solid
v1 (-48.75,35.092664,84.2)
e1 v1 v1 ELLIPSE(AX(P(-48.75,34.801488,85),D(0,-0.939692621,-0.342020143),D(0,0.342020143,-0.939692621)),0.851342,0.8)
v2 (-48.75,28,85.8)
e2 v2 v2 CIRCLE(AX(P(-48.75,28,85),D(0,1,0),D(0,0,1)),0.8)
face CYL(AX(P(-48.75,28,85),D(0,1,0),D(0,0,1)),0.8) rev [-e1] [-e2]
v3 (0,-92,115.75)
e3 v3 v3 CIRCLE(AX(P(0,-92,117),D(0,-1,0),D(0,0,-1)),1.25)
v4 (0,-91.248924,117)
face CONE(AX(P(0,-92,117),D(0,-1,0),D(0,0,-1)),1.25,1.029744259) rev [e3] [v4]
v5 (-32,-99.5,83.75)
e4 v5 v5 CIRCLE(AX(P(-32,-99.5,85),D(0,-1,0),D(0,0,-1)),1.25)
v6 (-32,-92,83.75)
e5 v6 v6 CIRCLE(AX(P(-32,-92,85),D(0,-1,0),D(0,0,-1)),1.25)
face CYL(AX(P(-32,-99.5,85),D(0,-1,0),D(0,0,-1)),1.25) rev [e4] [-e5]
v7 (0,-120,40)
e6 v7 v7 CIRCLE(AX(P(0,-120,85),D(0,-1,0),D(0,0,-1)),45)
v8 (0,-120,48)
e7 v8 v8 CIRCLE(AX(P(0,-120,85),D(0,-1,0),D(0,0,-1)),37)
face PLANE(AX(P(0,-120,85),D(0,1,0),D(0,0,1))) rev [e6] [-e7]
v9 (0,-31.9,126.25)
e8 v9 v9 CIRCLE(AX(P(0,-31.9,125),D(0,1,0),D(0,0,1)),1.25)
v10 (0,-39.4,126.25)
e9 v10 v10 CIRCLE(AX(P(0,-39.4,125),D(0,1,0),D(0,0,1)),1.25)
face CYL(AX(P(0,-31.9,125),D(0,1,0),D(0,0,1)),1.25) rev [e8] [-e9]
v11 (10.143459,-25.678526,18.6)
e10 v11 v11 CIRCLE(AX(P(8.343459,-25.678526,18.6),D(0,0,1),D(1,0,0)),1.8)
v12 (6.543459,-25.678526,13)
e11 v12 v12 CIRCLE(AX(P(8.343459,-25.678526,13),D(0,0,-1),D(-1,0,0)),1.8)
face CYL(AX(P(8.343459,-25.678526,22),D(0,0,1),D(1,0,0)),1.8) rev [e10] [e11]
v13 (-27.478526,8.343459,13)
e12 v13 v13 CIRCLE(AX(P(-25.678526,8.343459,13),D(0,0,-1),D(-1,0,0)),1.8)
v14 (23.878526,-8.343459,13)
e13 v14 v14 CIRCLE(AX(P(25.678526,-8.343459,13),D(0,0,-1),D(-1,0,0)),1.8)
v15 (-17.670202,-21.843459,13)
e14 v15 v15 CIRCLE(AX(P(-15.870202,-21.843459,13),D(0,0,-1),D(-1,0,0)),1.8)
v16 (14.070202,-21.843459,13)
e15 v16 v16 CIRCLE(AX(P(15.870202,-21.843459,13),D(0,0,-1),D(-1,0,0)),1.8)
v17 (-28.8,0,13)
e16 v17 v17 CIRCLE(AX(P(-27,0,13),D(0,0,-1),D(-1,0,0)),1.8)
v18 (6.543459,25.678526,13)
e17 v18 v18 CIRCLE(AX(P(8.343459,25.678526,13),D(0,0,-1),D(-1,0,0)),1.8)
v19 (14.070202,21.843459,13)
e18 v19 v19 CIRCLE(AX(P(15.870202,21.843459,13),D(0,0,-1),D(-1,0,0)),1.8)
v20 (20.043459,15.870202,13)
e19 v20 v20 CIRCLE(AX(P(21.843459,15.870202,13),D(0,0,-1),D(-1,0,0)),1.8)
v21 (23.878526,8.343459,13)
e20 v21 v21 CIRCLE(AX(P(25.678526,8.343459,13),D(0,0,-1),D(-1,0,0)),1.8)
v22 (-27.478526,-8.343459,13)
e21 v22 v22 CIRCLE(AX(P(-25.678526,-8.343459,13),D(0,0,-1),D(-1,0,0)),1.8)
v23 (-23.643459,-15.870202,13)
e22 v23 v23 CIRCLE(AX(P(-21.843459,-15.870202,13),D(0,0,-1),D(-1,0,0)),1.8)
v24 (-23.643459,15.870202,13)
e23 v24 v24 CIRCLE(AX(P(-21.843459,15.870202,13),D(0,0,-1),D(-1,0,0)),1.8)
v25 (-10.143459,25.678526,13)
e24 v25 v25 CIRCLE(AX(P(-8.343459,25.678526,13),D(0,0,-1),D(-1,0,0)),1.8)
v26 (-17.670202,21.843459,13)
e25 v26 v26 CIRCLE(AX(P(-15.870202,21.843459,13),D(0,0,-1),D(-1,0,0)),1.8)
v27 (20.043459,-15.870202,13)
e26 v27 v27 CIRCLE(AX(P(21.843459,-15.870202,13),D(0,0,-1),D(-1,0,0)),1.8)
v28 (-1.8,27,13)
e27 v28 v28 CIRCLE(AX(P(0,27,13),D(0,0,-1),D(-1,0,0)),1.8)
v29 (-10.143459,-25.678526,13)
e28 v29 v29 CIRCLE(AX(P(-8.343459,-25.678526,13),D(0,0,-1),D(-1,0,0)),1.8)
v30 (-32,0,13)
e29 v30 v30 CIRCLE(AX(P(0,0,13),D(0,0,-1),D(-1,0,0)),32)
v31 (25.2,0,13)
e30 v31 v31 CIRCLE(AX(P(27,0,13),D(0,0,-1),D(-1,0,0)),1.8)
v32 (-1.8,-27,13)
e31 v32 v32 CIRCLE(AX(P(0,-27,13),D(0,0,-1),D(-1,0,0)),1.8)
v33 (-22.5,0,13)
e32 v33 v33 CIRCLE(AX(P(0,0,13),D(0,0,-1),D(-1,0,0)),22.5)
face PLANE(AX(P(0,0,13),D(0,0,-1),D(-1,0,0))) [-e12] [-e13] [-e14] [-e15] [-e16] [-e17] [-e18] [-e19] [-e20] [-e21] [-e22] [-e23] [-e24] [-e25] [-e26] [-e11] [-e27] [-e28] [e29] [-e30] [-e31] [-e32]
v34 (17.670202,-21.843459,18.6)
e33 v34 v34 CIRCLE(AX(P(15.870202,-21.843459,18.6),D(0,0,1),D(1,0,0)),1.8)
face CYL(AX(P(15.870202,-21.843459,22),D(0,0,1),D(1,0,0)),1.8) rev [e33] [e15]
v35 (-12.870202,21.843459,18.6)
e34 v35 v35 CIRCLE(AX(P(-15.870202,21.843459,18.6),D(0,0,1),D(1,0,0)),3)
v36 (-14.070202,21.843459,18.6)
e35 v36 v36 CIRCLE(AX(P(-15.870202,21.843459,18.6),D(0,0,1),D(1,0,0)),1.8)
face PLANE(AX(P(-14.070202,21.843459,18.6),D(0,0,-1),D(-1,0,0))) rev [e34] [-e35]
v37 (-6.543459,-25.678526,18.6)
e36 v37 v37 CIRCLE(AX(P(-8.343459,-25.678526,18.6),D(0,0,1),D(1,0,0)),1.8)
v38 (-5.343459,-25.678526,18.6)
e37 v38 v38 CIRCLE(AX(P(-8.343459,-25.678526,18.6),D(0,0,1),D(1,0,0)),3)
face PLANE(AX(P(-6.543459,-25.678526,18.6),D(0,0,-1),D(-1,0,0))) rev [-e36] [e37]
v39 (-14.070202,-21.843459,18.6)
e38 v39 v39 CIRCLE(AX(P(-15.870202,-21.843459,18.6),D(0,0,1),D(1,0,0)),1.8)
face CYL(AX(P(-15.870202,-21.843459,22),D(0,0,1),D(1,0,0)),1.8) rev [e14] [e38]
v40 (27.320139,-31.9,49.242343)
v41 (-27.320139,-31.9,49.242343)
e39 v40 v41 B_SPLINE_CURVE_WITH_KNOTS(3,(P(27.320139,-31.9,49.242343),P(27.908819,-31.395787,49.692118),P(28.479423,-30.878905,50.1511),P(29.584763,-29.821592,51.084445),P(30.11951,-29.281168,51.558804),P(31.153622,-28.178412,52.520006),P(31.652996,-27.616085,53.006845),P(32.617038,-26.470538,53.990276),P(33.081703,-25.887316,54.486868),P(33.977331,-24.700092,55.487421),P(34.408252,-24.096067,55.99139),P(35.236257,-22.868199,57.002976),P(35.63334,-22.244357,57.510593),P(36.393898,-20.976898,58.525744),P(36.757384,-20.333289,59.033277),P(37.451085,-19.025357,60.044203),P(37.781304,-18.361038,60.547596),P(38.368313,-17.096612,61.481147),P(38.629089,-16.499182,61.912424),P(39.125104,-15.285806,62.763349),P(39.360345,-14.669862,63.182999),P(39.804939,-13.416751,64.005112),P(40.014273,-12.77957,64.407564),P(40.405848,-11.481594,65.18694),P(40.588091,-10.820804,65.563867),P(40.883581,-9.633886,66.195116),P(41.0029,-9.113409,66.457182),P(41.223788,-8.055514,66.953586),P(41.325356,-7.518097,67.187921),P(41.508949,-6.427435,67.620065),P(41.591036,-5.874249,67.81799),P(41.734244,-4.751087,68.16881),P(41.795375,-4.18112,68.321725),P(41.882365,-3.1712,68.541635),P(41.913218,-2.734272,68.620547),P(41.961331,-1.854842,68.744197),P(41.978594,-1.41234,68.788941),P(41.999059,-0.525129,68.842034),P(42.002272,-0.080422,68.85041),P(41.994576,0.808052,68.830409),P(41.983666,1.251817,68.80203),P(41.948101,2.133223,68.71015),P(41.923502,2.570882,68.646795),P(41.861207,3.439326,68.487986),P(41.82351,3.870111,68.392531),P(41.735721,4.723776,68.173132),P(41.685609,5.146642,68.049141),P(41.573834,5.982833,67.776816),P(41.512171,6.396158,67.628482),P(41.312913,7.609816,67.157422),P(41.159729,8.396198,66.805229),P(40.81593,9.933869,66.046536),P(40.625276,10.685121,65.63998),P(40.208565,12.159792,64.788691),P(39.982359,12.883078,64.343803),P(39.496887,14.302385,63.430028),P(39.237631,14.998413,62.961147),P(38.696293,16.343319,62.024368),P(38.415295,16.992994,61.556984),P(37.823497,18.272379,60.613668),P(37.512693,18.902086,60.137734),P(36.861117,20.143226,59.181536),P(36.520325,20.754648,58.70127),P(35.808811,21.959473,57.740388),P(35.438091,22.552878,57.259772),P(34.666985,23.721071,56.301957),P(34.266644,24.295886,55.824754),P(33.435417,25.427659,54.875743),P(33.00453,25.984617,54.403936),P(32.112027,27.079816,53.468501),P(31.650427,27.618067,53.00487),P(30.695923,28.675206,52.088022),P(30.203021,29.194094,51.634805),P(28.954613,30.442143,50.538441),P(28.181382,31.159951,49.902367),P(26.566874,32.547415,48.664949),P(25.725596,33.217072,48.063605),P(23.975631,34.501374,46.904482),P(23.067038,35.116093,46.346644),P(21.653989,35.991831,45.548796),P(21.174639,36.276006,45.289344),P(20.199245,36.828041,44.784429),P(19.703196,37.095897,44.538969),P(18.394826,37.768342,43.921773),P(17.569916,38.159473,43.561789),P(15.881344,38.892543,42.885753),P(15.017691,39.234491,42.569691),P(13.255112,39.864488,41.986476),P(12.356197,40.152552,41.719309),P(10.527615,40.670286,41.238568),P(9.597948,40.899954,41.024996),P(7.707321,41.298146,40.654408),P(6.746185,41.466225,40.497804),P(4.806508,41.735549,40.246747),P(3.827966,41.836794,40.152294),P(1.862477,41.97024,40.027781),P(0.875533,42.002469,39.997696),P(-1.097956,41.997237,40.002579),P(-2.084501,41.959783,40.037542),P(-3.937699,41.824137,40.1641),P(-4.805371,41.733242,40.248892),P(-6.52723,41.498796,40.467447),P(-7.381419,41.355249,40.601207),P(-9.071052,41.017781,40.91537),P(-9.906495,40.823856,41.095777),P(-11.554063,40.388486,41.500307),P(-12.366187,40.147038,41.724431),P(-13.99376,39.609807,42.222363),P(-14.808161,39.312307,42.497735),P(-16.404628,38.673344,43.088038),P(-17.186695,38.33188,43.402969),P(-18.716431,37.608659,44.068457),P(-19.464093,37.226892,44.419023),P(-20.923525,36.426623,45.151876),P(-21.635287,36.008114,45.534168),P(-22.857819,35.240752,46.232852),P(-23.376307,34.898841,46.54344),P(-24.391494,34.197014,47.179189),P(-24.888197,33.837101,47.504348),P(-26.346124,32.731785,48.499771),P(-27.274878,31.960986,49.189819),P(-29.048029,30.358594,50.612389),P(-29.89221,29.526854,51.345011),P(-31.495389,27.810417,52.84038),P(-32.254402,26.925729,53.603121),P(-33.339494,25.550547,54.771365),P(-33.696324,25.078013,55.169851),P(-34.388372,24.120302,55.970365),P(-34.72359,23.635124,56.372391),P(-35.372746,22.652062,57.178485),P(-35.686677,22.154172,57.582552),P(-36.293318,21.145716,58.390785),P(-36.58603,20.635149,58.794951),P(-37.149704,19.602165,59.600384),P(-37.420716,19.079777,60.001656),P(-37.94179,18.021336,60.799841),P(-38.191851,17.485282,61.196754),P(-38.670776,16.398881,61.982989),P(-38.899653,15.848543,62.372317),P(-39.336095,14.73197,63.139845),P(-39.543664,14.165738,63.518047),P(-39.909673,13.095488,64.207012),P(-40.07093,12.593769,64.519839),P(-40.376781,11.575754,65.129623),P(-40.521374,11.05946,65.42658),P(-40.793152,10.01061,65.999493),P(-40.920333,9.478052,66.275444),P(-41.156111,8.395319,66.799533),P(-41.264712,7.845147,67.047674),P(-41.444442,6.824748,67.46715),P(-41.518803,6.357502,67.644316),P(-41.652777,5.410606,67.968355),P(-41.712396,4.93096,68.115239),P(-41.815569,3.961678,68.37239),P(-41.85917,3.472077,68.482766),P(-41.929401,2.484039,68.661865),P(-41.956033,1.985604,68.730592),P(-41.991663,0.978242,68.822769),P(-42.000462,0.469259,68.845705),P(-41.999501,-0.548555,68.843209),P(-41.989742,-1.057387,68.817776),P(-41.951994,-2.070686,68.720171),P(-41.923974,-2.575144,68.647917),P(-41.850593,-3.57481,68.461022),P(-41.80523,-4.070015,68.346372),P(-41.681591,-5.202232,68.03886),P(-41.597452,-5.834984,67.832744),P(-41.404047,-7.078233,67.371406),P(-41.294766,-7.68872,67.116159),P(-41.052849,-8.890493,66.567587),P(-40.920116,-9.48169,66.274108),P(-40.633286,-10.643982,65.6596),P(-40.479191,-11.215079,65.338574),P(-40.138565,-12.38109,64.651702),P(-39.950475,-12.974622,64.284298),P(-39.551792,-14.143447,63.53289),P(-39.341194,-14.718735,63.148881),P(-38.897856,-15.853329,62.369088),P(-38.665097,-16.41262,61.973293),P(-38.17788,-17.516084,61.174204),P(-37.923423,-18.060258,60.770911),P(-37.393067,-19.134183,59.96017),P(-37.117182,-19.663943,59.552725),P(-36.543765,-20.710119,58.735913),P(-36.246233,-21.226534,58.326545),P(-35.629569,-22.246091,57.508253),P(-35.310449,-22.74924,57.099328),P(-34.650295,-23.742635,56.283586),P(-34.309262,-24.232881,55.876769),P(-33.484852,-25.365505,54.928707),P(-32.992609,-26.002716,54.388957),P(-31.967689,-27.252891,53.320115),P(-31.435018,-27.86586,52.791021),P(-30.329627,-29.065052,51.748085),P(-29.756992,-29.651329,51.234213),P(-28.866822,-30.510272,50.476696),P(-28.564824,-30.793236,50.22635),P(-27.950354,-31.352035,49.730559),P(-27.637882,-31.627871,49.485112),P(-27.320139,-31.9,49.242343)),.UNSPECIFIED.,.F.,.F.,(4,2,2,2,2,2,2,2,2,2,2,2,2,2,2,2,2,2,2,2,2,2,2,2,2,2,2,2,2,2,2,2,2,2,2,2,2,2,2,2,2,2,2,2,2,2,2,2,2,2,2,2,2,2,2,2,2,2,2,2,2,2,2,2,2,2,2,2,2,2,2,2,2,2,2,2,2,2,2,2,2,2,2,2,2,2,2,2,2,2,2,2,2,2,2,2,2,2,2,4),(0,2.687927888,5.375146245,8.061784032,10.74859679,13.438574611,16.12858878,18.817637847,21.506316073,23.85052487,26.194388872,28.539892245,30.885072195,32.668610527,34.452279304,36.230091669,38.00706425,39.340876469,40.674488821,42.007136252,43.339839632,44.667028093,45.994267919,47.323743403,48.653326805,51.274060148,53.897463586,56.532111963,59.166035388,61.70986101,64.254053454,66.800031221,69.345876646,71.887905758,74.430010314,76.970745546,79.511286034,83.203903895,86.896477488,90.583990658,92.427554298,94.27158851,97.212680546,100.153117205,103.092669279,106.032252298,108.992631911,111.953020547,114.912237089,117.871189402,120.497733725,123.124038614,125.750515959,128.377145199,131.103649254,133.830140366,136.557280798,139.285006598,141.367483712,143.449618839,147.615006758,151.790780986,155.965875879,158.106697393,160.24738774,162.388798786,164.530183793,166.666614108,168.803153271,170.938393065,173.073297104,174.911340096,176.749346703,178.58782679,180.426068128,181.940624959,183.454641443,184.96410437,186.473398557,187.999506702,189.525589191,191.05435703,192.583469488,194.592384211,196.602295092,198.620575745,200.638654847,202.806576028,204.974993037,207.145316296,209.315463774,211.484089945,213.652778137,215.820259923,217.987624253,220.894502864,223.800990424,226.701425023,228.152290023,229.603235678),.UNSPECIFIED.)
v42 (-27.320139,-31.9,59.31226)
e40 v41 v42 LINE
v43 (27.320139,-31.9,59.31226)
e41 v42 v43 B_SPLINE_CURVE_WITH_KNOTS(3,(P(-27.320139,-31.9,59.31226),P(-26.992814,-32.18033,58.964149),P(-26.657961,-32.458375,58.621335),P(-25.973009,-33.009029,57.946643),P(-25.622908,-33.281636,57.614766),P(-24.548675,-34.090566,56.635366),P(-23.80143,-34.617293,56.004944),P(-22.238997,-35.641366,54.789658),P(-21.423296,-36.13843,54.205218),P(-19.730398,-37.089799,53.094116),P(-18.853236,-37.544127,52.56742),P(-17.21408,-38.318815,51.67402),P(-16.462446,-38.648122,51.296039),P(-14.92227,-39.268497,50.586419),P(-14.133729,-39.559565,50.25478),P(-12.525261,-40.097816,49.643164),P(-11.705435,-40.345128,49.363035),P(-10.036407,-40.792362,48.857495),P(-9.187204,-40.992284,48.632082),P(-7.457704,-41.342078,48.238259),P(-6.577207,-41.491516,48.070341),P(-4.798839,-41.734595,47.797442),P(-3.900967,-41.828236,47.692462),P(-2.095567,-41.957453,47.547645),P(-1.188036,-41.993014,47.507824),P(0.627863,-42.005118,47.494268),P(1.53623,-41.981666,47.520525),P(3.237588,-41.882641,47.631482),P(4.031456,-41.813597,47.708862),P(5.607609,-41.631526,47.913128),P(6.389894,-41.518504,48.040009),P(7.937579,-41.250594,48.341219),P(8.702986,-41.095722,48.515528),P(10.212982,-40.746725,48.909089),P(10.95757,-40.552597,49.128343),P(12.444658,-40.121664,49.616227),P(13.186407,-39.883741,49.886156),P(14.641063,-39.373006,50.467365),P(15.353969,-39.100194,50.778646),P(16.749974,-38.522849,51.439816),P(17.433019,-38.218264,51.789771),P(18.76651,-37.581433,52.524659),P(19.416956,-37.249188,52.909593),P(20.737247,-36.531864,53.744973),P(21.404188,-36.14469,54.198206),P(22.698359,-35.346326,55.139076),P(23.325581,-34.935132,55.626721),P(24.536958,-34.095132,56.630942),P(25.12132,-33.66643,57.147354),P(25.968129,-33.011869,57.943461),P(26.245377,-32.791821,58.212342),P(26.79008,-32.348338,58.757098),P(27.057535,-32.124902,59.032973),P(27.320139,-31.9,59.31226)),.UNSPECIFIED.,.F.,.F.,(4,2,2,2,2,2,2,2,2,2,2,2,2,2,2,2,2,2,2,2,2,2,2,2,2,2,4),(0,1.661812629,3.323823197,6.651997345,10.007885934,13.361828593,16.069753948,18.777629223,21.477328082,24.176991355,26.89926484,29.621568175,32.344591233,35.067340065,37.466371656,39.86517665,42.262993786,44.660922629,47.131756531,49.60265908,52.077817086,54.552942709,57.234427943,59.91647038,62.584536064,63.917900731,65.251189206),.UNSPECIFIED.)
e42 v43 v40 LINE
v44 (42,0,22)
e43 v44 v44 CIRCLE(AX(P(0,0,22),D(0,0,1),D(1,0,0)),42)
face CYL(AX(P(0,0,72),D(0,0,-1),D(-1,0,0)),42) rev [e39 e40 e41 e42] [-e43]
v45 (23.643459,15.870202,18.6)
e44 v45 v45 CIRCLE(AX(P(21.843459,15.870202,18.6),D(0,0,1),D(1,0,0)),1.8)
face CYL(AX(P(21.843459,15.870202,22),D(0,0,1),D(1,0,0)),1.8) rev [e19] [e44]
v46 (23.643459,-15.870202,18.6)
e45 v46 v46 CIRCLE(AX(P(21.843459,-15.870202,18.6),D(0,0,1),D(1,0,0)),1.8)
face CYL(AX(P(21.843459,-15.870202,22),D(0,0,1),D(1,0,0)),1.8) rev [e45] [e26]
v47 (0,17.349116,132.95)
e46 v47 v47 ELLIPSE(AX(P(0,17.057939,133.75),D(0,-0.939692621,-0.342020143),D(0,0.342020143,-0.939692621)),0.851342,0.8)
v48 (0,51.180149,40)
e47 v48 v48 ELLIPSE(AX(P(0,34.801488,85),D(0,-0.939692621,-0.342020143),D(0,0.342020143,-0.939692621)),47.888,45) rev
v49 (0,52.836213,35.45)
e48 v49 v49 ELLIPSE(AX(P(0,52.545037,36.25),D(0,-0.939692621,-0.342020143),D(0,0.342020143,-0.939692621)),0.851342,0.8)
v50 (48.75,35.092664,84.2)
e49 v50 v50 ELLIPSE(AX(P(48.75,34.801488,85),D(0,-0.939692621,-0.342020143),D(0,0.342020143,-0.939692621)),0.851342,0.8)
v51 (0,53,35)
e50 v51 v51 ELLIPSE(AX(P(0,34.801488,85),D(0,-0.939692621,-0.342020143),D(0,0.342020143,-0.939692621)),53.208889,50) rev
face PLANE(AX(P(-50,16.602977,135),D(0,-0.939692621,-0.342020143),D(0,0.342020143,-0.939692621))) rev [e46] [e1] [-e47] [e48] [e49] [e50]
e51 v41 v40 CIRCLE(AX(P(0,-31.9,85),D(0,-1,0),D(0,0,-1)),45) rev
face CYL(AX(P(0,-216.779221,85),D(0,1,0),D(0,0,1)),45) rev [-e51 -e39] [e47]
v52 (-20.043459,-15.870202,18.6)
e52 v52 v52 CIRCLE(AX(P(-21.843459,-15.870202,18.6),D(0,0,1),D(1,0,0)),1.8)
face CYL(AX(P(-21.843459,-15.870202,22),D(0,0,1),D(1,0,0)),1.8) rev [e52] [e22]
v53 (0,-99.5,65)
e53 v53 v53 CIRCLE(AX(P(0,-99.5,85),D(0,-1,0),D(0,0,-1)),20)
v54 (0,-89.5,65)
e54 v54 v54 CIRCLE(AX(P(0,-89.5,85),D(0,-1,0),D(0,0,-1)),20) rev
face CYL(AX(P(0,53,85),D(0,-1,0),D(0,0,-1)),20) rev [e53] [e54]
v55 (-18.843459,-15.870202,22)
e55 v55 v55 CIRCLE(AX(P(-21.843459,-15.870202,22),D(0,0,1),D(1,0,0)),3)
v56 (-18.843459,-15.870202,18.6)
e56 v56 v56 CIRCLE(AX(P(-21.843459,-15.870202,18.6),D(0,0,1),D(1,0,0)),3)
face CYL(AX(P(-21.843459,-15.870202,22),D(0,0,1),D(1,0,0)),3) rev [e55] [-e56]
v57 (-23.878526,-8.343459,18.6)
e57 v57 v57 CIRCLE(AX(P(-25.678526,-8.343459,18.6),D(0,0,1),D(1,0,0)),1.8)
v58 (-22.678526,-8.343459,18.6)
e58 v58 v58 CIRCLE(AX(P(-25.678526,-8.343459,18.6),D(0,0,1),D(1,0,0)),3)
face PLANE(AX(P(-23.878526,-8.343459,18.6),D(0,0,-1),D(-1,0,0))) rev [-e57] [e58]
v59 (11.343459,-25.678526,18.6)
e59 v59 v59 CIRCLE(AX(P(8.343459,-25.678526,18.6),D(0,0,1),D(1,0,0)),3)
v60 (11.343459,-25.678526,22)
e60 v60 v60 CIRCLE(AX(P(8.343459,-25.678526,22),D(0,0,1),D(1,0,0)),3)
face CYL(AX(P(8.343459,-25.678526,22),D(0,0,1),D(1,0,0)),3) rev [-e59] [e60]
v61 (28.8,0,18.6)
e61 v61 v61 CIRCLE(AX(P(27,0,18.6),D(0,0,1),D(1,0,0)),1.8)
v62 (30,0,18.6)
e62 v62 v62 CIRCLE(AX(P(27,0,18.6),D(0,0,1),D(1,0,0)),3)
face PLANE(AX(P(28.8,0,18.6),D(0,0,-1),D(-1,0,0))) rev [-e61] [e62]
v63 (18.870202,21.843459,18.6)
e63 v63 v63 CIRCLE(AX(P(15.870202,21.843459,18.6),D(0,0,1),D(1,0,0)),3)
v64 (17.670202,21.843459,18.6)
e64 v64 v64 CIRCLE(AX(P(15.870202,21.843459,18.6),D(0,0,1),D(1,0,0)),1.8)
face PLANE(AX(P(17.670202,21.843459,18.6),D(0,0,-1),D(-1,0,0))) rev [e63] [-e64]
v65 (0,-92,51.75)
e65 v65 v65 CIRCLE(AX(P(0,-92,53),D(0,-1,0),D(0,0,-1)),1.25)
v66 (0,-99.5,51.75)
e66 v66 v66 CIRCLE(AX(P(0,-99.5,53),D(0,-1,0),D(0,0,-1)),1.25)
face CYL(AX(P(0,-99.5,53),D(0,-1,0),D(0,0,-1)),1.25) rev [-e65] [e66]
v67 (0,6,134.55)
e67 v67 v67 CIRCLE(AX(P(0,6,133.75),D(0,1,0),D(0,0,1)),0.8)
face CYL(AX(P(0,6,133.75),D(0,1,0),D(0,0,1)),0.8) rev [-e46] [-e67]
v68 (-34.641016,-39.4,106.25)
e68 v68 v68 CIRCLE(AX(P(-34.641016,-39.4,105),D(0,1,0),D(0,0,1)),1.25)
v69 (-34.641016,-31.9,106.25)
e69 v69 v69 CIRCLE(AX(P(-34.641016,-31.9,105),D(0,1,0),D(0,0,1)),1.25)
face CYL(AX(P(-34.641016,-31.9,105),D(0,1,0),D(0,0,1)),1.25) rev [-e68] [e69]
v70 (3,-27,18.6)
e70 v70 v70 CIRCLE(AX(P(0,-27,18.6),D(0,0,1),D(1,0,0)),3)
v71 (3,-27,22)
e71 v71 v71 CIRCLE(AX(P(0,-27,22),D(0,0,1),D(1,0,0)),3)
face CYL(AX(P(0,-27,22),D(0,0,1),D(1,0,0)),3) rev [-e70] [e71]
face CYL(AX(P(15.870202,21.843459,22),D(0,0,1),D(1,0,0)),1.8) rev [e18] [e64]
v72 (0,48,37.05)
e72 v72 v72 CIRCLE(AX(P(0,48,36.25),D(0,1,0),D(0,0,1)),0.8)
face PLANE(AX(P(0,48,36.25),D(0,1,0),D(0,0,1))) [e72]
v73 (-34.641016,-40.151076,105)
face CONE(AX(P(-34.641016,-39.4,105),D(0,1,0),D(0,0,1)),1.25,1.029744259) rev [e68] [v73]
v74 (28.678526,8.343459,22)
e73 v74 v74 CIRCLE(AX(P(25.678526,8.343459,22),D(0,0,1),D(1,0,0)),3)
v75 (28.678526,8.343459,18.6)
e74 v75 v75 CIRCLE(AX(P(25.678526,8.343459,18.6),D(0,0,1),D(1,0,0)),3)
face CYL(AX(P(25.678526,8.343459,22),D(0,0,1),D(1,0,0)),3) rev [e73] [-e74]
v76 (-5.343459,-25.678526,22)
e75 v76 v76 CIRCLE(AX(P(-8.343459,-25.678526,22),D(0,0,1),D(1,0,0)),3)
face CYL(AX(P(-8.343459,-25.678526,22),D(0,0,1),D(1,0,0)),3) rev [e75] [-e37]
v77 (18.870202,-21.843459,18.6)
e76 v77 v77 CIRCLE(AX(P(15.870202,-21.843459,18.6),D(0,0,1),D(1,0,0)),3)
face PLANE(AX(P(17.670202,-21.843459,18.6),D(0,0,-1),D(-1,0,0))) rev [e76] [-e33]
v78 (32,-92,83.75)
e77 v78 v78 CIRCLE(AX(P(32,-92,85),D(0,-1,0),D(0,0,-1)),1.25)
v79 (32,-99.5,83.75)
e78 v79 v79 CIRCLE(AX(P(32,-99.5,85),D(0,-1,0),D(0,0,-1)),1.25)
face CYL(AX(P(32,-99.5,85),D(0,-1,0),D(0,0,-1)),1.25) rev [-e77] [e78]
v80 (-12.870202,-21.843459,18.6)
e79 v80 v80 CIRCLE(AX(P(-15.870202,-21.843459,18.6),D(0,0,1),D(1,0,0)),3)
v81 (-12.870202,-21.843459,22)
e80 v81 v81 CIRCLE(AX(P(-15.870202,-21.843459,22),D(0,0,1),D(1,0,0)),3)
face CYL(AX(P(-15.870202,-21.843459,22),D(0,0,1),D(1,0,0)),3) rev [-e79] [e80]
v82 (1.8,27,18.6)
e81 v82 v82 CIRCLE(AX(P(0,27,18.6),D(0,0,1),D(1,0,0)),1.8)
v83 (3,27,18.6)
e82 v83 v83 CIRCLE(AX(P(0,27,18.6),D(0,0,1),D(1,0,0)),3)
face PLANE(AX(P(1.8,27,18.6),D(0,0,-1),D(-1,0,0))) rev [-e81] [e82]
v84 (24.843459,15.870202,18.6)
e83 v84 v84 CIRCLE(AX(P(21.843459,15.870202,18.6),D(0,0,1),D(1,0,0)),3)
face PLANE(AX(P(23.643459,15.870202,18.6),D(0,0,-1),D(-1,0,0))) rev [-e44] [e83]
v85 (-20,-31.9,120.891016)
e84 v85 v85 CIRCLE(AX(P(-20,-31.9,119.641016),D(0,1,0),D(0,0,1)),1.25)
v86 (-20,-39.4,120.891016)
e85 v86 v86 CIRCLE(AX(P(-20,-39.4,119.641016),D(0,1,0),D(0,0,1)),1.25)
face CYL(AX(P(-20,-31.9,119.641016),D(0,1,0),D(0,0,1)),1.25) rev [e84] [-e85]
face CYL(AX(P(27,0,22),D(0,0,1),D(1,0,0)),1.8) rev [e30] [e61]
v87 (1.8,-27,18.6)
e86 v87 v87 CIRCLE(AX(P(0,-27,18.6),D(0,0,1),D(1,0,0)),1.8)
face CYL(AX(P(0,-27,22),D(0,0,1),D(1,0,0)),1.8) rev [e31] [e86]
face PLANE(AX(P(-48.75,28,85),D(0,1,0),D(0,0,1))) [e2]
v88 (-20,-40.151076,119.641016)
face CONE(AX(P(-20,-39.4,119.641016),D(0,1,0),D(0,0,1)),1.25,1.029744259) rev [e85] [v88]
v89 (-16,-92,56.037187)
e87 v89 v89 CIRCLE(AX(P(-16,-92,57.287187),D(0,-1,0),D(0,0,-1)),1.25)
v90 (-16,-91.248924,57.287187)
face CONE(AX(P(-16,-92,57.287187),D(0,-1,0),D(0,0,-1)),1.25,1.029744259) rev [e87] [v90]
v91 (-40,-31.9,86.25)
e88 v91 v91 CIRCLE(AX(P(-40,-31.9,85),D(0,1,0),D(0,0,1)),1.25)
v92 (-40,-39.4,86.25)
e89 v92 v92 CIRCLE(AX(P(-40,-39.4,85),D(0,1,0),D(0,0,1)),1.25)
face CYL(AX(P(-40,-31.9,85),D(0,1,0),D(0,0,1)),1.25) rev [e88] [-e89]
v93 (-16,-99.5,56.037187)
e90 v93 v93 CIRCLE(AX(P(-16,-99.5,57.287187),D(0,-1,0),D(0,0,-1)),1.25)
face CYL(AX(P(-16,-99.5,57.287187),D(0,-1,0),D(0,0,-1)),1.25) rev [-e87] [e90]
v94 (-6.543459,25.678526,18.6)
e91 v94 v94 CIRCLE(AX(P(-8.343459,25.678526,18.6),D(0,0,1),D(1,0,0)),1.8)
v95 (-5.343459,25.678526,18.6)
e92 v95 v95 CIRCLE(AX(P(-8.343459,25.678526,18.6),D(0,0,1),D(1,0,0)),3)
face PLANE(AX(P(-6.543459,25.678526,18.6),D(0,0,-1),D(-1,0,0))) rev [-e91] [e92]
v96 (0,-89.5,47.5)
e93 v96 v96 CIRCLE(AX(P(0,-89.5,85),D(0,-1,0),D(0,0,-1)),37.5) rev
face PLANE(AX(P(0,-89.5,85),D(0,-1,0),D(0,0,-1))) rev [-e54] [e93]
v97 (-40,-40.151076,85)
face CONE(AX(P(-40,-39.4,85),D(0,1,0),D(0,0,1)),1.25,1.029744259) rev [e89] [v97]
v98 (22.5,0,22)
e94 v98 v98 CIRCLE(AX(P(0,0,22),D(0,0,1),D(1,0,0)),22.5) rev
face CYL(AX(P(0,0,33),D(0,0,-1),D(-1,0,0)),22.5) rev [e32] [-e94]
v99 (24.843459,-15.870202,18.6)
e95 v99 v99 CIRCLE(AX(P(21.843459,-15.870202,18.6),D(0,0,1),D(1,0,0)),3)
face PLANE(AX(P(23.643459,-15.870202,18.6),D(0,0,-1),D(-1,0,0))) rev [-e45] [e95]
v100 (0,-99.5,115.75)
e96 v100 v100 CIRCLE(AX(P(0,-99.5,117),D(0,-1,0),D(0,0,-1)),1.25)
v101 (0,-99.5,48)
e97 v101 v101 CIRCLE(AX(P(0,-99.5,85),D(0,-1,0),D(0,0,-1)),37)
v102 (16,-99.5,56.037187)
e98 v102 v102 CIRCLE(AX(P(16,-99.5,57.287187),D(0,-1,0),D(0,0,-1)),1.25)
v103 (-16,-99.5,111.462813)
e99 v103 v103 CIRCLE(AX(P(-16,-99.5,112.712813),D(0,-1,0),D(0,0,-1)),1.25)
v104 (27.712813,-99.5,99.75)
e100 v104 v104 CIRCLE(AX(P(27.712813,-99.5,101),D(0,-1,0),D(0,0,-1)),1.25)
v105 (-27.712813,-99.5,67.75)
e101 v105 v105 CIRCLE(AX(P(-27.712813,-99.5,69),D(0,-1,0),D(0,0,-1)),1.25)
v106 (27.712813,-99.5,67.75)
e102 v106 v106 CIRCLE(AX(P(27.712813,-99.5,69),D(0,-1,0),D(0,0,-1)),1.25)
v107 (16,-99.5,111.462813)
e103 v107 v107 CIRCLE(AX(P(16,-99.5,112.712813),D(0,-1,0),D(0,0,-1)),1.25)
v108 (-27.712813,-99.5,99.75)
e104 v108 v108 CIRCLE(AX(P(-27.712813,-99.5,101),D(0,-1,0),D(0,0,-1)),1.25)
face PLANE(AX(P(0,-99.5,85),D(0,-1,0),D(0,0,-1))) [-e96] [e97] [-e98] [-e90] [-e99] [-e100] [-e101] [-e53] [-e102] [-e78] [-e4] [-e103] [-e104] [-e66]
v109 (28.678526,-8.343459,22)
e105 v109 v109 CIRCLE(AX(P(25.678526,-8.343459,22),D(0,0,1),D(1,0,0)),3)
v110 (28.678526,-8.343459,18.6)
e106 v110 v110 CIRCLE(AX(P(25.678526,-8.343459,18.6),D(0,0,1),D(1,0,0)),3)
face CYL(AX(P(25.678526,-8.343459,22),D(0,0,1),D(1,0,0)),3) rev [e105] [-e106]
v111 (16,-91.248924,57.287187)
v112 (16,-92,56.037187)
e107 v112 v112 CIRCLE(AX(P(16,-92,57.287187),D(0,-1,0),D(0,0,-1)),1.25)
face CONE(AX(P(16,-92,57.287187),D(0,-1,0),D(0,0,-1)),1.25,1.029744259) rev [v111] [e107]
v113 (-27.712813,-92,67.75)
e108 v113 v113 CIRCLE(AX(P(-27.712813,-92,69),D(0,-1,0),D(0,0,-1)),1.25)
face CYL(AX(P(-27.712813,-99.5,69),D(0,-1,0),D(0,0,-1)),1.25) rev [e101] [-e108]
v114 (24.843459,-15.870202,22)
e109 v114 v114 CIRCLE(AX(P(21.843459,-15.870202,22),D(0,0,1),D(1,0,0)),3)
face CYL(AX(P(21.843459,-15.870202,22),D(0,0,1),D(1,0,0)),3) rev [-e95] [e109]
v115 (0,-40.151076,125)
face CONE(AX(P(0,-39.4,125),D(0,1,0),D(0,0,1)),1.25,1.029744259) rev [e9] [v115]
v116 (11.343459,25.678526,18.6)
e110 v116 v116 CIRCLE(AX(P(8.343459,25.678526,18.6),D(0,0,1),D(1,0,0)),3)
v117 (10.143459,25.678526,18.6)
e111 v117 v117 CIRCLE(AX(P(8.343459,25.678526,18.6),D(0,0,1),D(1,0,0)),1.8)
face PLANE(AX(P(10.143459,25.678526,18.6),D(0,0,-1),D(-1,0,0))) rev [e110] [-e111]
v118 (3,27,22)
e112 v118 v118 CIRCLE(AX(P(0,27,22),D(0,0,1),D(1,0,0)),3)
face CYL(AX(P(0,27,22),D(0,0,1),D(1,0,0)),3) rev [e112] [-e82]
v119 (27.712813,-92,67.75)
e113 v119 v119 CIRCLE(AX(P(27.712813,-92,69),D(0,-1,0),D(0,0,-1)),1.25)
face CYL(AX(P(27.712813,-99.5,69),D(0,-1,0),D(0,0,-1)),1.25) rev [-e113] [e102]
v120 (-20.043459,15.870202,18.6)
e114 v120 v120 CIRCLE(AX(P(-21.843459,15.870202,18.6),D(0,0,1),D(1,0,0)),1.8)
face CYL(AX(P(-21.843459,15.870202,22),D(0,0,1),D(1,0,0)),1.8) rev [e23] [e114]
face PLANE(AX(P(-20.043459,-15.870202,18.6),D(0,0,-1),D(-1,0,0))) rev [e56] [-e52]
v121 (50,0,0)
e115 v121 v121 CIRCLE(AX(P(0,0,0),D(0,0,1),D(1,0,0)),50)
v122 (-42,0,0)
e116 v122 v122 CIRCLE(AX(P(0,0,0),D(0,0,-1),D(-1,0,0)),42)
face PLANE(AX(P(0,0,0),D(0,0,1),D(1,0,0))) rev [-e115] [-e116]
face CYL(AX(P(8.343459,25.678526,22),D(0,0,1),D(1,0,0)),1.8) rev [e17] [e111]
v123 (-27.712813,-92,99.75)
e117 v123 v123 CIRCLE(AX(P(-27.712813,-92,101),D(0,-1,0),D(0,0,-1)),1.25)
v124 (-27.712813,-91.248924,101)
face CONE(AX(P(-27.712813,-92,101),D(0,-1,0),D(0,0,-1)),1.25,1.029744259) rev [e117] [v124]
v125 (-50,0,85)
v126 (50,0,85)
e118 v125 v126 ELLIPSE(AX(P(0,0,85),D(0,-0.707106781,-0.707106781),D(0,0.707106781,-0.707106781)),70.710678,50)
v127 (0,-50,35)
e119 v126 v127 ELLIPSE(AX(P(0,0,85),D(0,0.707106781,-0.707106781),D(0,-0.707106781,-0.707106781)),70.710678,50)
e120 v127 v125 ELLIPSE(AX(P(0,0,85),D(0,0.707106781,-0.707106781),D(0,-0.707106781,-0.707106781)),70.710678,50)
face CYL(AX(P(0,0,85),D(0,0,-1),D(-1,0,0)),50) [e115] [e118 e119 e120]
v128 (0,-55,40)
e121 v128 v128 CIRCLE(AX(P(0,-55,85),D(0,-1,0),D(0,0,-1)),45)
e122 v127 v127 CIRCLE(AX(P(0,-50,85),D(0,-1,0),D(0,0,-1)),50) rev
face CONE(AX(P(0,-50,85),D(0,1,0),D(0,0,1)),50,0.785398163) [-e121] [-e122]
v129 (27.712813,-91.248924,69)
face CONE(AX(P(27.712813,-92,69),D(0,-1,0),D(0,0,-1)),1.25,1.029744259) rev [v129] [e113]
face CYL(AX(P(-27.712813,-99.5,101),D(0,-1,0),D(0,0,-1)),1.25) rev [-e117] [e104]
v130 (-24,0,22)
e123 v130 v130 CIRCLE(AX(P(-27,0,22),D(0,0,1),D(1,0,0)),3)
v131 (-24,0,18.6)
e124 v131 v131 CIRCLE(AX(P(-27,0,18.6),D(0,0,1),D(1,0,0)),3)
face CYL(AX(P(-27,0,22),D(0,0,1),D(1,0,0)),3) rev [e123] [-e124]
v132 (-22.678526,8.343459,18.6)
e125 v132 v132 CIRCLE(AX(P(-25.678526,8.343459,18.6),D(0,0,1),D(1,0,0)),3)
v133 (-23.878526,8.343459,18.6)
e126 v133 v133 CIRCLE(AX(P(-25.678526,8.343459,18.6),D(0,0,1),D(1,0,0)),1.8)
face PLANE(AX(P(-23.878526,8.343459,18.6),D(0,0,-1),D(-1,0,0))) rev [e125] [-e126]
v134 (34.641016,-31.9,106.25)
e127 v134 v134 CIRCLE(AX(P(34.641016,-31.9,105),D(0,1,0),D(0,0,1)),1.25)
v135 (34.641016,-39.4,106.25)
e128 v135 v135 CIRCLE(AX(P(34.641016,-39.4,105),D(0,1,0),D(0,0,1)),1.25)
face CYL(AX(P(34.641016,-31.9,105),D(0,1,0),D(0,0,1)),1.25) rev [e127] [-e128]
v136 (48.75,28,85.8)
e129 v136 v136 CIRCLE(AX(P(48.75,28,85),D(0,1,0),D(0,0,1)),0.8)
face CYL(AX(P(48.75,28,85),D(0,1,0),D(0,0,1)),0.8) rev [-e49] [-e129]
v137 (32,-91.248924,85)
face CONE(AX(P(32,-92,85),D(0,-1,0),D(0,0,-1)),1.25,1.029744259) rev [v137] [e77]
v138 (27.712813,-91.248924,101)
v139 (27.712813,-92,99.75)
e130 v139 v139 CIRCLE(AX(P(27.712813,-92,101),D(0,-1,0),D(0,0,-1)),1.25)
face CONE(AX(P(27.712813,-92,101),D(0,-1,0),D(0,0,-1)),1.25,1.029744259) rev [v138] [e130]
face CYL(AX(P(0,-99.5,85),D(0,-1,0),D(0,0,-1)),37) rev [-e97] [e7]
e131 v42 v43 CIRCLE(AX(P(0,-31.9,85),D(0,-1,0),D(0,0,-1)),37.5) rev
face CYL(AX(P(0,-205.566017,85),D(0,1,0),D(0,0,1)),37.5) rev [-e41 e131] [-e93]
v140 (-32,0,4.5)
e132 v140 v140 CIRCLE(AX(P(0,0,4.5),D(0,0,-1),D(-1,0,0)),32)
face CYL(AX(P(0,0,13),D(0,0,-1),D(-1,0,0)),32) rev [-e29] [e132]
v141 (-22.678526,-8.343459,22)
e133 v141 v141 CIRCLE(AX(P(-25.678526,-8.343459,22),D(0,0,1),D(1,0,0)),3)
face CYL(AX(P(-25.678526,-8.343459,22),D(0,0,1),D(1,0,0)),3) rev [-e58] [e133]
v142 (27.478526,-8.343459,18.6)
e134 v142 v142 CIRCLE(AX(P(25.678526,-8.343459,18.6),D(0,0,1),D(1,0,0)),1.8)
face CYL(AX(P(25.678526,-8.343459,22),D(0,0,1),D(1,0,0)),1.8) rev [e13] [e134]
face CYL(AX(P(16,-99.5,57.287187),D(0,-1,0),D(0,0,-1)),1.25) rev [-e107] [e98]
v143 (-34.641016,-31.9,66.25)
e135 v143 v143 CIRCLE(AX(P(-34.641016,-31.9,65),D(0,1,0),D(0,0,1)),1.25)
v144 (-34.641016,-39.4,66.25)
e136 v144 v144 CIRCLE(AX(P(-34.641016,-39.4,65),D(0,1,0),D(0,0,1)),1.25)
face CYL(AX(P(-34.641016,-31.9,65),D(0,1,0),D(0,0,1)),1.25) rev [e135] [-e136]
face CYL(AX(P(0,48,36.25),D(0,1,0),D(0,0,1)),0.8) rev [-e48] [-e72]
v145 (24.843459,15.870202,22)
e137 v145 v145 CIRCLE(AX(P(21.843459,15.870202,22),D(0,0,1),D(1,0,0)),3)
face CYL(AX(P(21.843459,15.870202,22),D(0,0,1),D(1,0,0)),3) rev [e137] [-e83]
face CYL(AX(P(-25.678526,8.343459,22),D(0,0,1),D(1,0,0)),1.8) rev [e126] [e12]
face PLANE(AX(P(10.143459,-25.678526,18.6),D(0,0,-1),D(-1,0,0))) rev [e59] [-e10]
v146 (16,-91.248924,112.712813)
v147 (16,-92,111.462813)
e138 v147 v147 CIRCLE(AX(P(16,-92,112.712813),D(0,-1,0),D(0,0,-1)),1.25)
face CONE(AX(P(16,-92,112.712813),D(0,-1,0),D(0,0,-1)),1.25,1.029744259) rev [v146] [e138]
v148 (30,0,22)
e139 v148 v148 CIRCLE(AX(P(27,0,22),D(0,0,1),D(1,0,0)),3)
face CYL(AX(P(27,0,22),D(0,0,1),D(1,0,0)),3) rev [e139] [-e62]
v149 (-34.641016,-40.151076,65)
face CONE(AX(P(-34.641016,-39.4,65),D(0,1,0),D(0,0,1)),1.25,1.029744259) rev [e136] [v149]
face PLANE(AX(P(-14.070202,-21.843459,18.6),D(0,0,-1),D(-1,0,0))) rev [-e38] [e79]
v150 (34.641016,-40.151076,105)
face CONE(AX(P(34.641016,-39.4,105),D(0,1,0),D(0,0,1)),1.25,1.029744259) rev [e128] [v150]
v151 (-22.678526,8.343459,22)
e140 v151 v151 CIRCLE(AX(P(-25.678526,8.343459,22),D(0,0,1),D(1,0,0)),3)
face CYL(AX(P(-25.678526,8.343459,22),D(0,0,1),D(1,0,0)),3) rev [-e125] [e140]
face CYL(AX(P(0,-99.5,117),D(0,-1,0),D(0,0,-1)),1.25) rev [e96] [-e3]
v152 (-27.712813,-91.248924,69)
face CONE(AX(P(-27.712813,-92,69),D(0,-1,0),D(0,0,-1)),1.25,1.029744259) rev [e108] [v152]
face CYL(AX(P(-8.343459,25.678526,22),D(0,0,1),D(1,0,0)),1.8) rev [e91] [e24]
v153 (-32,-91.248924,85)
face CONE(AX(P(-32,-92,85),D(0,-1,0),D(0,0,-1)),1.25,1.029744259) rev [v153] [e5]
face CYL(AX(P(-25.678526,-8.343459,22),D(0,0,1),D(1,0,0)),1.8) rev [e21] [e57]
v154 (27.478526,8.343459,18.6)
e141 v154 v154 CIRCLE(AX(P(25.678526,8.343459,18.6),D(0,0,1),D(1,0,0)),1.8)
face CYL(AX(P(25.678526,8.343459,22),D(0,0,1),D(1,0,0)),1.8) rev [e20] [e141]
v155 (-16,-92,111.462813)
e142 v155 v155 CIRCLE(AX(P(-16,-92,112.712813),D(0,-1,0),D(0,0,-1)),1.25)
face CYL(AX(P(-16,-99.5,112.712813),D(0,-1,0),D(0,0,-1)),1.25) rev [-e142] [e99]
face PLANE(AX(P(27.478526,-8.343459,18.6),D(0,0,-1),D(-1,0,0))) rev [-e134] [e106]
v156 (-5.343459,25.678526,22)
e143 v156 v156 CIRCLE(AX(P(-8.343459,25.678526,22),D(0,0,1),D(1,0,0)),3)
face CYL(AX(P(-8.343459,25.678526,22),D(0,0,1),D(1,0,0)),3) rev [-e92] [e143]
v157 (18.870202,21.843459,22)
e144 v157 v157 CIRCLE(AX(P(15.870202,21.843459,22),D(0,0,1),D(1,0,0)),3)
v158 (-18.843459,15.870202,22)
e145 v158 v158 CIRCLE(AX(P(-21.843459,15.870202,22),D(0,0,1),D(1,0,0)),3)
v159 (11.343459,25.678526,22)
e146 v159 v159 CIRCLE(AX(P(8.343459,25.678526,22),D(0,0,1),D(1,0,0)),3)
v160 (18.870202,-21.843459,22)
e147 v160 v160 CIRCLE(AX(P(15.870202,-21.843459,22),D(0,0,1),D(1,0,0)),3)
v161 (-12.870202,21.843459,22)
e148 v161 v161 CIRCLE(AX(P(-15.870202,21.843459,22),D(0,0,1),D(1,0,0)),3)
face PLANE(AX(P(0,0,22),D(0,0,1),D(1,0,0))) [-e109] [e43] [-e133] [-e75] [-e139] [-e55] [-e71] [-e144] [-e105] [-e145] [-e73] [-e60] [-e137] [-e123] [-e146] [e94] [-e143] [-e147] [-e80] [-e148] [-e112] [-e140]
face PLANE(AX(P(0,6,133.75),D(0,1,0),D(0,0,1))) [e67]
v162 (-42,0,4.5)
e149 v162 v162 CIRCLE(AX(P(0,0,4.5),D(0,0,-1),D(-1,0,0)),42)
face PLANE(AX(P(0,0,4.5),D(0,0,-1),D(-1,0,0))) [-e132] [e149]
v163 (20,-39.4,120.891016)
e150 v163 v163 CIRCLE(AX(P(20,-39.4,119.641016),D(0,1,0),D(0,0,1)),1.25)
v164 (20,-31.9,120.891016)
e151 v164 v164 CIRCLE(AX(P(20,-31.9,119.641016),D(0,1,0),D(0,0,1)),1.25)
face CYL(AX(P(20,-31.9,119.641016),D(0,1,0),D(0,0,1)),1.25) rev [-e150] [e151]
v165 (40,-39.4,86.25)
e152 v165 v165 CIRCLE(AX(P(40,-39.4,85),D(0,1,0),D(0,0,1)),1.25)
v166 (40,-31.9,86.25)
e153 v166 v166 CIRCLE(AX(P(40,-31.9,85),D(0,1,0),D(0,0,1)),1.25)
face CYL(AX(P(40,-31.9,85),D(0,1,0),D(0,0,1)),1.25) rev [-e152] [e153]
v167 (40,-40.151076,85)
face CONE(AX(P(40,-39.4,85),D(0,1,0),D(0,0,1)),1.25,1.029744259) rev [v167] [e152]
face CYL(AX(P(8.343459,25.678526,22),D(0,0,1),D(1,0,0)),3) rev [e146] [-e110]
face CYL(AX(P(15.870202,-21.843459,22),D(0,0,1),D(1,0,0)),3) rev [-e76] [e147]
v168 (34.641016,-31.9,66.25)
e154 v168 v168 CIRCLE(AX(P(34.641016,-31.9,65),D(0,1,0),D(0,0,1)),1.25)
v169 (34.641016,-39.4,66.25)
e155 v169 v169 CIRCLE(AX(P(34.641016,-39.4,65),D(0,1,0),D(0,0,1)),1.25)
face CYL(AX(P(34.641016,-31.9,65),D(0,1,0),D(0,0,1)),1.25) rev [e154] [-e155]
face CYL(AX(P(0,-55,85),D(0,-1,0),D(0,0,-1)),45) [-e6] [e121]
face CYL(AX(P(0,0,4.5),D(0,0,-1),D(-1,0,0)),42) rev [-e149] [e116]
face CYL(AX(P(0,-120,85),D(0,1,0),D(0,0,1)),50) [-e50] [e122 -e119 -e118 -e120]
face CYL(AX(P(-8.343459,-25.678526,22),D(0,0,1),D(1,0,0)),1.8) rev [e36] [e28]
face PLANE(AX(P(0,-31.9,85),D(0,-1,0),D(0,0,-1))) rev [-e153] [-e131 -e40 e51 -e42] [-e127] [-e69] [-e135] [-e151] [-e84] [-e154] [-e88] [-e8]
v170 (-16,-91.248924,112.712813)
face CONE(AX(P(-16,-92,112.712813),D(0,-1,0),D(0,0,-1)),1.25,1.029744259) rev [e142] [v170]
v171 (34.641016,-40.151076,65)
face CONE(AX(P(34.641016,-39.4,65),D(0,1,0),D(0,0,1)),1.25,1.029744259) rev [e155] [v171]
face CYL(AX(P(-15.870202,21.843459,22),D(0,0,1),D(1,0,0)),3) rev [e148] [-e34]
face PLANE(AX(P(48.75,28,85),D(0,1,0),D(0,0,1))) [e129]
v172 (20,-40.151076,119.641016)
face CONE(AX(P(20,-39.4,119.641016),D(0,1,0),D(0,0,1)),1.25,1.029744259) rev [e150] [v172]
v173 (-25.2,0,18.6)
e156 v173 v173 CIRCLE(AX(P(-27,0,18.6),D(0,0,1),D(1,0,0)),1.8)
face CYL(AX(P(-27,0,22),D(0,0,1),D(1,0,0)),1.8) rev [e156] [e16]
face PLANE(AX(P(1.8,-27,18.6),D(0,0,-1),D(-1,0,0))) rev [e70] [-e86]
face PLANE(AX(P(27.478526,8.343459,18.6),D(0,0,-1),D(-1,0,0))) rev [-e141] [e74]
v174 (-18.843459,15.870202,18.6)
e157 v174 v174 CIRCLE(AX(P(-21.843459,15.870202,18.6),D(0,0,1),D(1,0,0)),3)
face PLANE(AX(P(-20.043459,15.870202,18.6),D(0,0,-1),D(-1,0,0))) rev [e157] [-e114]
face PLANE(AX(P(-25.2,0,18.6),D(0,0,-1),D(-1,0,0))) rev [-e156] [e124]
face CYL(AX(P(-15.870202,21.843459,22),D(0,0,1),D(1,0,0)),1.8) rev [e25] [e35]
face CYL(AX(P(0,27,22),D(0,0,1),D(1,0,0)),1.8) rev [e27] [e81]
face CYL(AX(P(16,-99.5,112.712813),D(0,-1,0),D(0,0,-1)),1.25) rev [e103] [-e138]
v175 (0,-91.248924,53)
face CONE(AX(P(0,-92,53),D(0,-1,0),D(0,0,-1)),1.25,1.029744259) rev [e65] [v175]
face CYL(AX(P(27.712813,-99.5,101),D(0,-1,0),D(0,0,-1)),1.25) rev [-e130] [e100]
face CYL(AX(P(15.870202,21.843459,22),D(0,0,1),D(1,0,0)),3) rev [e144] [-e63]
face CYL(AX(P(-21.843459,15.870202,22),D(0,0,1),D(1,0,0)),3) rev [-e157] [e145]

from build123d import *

# Parameters (mm, degrees)
SKETCH_1_R                = 50
EXTRUDE_1_DEPTH           = 85
EXTRUDE_2_DEPTH           = 53
EXTRUDE_2_DEPTH_BACK      = 120
SKETCH_2_R                = 50
SKETCH_3_R                = 42
CUT_EXTRUDE_1_DEPTH       = 4.5
SKETCH_4_R                = 32
CUT_EXTRUDE_2_DEPTH       = 8.5
SKETCH_5_R                = 37
CUT_EXTRUDE_3_DEPTH       = 20.5
SKETCH_6_OUTSIDE_W        = 150.23
SKETCH_6_OUTSIDE_H        = 185.23
SKETCH_6_OUTSIDE_R        = 45
CUT_EXTRUDE_4_DEPTH       = 65
CHAMFER_1_SIZE            = 5
PATTERN_CIRCULAR_1_COUNT  = 12
SKETCH_9_R                = 20
CUT_EXTRUDE_5_DEPTH       = 210.717071313
SKETCH_10_R               = 37.5
CUT_EXTRUDE_6_DEPTH       = 142.5
CUT_EXTRUDE_START         = -84.9
SKETCH_11_R               = 45
CUT_EXTRUDE_7_DEPTH       = 84.9
SKETCH_15_R               = 22.5
CUT_EXTRUDE_8_DEPTH       = 20
SKETCH_17_R               = 42
CUT_EXTRUDE_9_DEPTH       = 50
HOLE_WIZARD_1_D           = 3.6
HOLE_WIZARD_1_DEPTH       = 22
HOLE_WIZARD_1_CBORE_D     = 6
HOLE_WIZARD_1_CBORE_DEPTH = 3.4
PATTERN_CIRCULAR_3_COUNT  = 20
CUT_EXTRUDE_10_DEPTH      = 188.41664814
CUT_EXTRUDE_10_DEPTH_BACK = 188.41664814
PATTERN_CIRCULAR_4_COUNT  = 5
PATTERN_CIRCULAR_4_ANGLE  = 120
SKETCH_25_R               = 0.8
CUT_EXTRUDE_11_DEPTH      = 47
SKETCH_26_R               = 0.8
CUT_EXTRUDE_12_DEPTH      = 25
SKETCH_27_R               = 0.8
CUT_EXTRUDE_13_DEPTH      = 5


with BuildPart() as part:
    # 草图1 → 凸台-拉伸1 (new body)
    with BuildSketch(Plane.XY):
        Circle(SKETCH_1_R)
    extrude(amount=EXTRUDE_1_DEPTH)

    # 草图2 → 凸台-拉伸2 (add, two sides: drawn at the far end of the back side and taken through both)
    with BuildSketch(Plane(origin=(0, 0, 0), x_dir=(1, 0, 0), z_dir=(0, 1, 0)).offset(-EXTRUDE_2_DEPTH_BACK)):
        with Locations(Location((0, -85, 0), (0, 0, 270))):
            Circle(SKETCH_2_R)
    extrude(amount=EXTRUDE_2_DEPTH + EXTRUDE_2_DEPTH_BACK)

    # 草图3 → 切除-拉伸1 (cut)
    with BuildSketch(Plane(origin=(0, 0, 0), x_dir=(-1, 0, 0), z_dir=(0, 0, -1))):
        Circle(SKETCH_3_R)
    extrude(amount=-CUT_EXTRUDE_1_DEPTH, mode=Mode.SUBTRACT)

    # 草图4 → 切除-拉伸2 (cut)
    with BuildSketch(Plane(origin=(0, 0, 4.5), x_dir=(-1, 0, 0), z_dir=(0, 0, -1))):
        Circle(SKETCH_4_R)
    extrude(amount=-CUT_EXTRUDE_2_DEPTH, mode=Mode.SUBTRACT)

    # 草图5 → 切除-拉伸3 (cut)
    with BuildSketch(Plane.XZ.offset(120)):
        with Locations(Location((0, 85, 0), (0, 0, 270))):
            Circle(SKETCH_5_R)
    extrude(amount=-CUT_EXTRUDE_3_DEPTH, mode=Mode.SUBTRACT)

    # 草图6 outside → 切除-拉伸4 (cut)
    with BuildSketch(Plane.XZ.offset(120)):
        with Locations((0, 67.5)):
            Rectangle(SKETCH_6_OUTSIDE_W, SKETCH_6_OUTSIDE_H)
        with Locations(Location((0, 85, 0), (0, 0, 270))):
            Circle(SKETCH_6_OUTSIDE_R, mode=Mode.SUBTRACT)
    extrude(amount=-CUT_EXTRUDE_4_DEPTH, mode=Mode.SUBTRACT)

    # 倒角1
    chamfer_1_edges = [part.edges().sort_by_distance(p)[0] for p in [
        (0, -55, 35),
    ]]
    chamfer(chamfer_1_edges, length=CHAMFER_1_SIZE - 0.0001)  # a hair under: the kernel refuses the full size

    # 草图7 → M3 螺纹孔1 (revolve, cut)
    with BuildSketch(Plane(origin=(0, -99.5, 117), x_dir=(0, 0, -1), z_dir=(1, 0, 0))):
        Polygon((0, 0), (0, 8.251075774), (1.25, 7.5), (1.25, 0), align=None)
    hole_wizard_m3_1 = revolve(axis=Axis((0, -105.85, 117), (0, 1, 0)), mode=Mode.SUBTRACT)

    # 阵列(圆周)1: M3 螺纹孔1 ×12 about axis
    pattern_circular_1_axis = Axis((0, 0, 85), (0, 1, 0))
    for i in range(1, PATTERN_CIRCULAR_1_COUNT):
        add(hole_wizard_m3_1.rotate(pattern_circular_1_axis, i * 360 / PATTERN_CIRCULAR_1_COUNT), mode=Mode.SUBTRACT)

    # 草图9 → 切除-拉伸5 (cut, through all)
    with BuildSketch(Plane.XZ.offset(99.5)):
        with Locations(Location((0, 85, 0), (0, 0, 270))):
            Circle(SKETCH_9_R)
    extrude(amount=-CUT_EXTRUDE_5_DEPTH, mode=Mode.SUBTRACT)

    # 草图10 → 切除-拉伸6 (cut)
    with BuildSketch(Plane(origin=(0, 53, 0), x_dir=(1, 0, 0), z_dir=(0, 1, 0))):
        with Locations(Location((0, -85, 0), (0, 0, 270))):
            Circle(SKETCH_10_R)
    extrude(amount=-CUT_EXTRUDE_6_DEPTH, mode=Mode.SUBTRACT)

    # 草图11 → 切除-拉伸7 (cut)
    with BuildSketch(Plane(origin=(0, 53, 0), x_dir=(1, 0, 0), z_dir=(0, 1, 0)).offset(CUT_EXTRUDE_START)):
        with Locations(Location((0, -85, 0), (0, 0, 90))):
            Circle(SKETCH_11_R)
    extrude(amount=CUT_EXTRUDE_7_DEPTH, mode=Mode.SUBTRACT)

    # 草图15 → 切除-拉伸8 (cut)
    with BuildSketch(Plane(origin=(0, 0, 13), x_dir=(-1, 0, 0), z_dir=(0, 0, -1))):
        Circle(SKETCH_15_R)
    extrude(amount=-CUT_EXTRUDE_8_DEPTH, mode=Mode.SUBTRACT)

    # 草图17 → 切除-拉伸9 (cut)
    with BuildSketch(Plane.XY.offset(22)):
        with Locations(Location((0, 0, 0), (0, 0, 180))):
            Circle(SKETCH_17_R)
    extrude(amount=CUT_EXTRUDE_9_DEPTH, mode=Mode.SUBTRACT)

    # 打孔尺寸(%根据)内六角圆柱头螺钉的类型1
    with Locations(Plane.XY.offset(22)):
        with Locations((-27, 0)):
            hole_wizard_1 = CounterBoreHole(HOLE_WIZARD_1_D / 2, HOLE_WIZARD_1_CBORE_D / 2, HOLE_WIZARD_1_CBORE_DEPTH, depth=HOLE_WIZARD_1_DEPTH)

    # 阵列(圆周)3: 打孔尺寸(%根据)内六角圆柱头螺钉的类型1 ×20 about axis
    pattern_circular_3_axis = Axis((0, 0, 0), (0, 0, 1))
    for i in range(1, PATTERN_CIRCULAR_3_COUNT):
        add(hole_wizard_1.rotate(pattern_circular_3_axis, i * 360 / PATTERN_CIRCULAR_3_COUNT), mode=Mode.SUBTRACT)

    # 草图22 → 切除-拉伸10 (cut, two sides: drawn at the far end of the back side and taken through both)
    with BuildSketch(Plane(origin=(0, 0, 0), x_dir=(0, 0, -1), z_dir=(1, 0, 0)).offset(-CUT_EXTRUDE_10_DEPTH_BACK)):
        Polygon((-35, 53), (-135, 53), (-135, 16.602976573), align=None)
    extrude(amount=CUT_EXTRUDE_10_DEPTH + CUT_EXTRUDE_10_DEPTH_BACK, mode=Mode.SUBTRACT)

    # 草图23 → M3 螺纹孔3 (revolve, cut)
    with BuildSketch(Plane(origin=(0, -31.9, 125), x_dir=(0, 0, 1), z_dir=(1, 0, 0))):
        Polygon((0, 0), (0, 8.251075774), (1.25, 7.5), (1.25, 0), align=None)
    hole_wizard_m3_3 = revolve(axis=Axis((0, -25.55, 125), (0, -1, 0)), mode=Mode.SUBTRACT)

    # 阵列(圆周)4: M3 螺纹孔3 ×5 about axis
    pattern_circular_4_axis = Axis((0, 0, 85), (0, 1, 0))
    for i in range(1, PATTERN_CIRCULAR_4_COUNT):
        add(hole_wizard_m3_3.rotate(pattern_circular_4_axis, i * PATTERN_CIRCULAR_4_ANGLE / (PATTERN_CIRCULAR_4_COUNT - 1)), mode=Mode.SUBTRACT)

    # 镜向1 copy 1 sketch → 镜向1 copy 1 (revolve, cut)
    with BuildSketch(Plane(origin=(-20, -31.9, 119.641016151), x_dir=(-0.5000000000000011, 0, 0.866025403784438), z_dir=(-0.866025403784438, 0, -0.5000000000000011))):
        Polygon((0, 0), (0, -8.251075774), (1.25, -7.5), (1.25, 0), align=None)
    revolve(axis=Axis((-20, -25.55, 119.641016151), (0, 1, 0)), mode=Mode.SUBTRACT)

    # 镜向1 copy 2 sketch → 镜向1 copy 2 (revolve, cut)
    with BuildSketch(Plane(origin=(-34.641016151, -31.9, 105), x_dir=(-0.8660254037844399, 0, 0.4999999999999978), z_dir=(-0.4999999999999978, 0, -0.8660254037844399))):
        Polygon((0, 0), (0, -8.251075774), (1.25, -7.5), (1.25, 0), align=None)
    revolve(axis=Axis((-34.641016151, -25.55, 105), (0, 1, 0)), mode=Mode.SUBTRACT)

    # 镜向1 copy 3 sketch → 镜向1 copy 3 (revolve, cut)
    with BuildSketch(Plane(origin=(-40, -31.9, 85), x_dir=(-1, 0, 0), z_dir=(0, 0, -1))):
        Polygon((0, 0), (0, -8.251075774), (1.25, -7.5), (1.25, 0), align=None)
    revolve(axis=Axis((-40, -25.55, 85), (0, 1, 0)), mode=Mode.SUBTRACT)

    # 镜向1 copy 4 sketch → 镜向1 copy 4 (revolve, cut)
    with BuildSketch(Plane(origin=(-34.641016151, -31.9, 65), x_dir=(-0.866025403784436, 0, -0.5000000000000044), z_dir=(0.5000000000000044, 0, -0.866025403784436))):
        Polygon((0, 0), (0, -8.251075774), (1.25, -7.5), (1.25, 0), align=None)
    revolve(axis=Axis((-34.641016151, -25.55, 65), (0, 1, 0)), mode=Mode.SUBTRACT)

    # 镜向1 copy 5 sketch → 镜向1 copy 5 (revolve, cut)
    with BuildSketch(Plane(origin=(0, -31.9, 125), x_dir=(0, 0, 1), z_dir=(-1, 0, 0))):
        Polygon((0, 0), (0, -8.251075774), (1.25, -7.5), (1.25, 0), align=None)
    revolve(axis=Axis((0, -25.55, 125), (0, 1, 0)), mode=Mode.SUBTRACT)

    # 草图25 → 切除-拉伸11 (cut)
    with BuildSketch(Plane(origin=(0, 53, 0), x_dir=(1, 0, 0), z_dir=(0, 1, 0))):
        with Locations(Location((0, -133.75, 0), (0, 0, 270))):
            Circle(SKETCH_25_R)
    extrude(amount=-CUT_EXTRUDE_11_DEPTH, mode=Mode.SUBTRACT)

    # 草图26 → 切除-拉伸12 (cut)
    with BuildSketch(Plane(origin=(0, 53, 0), x_dir=(1, 0, 0), z_dir=(0, 1, 0))):
        with Locations(Location((-48.75, -85, 0), (0, 0, 270))):
            Circle(SKETCH_26_R)
        with Locations(Location((48.75, -85, 0), (0, 0, 270))):
            Circle(SKETCH_26_R)
    extrude(amount=-CUT_EXTRUDE_12_DEPTH, mode=Mode.SUBTRACT)

    # 草图27 → 切除-拉伸13 (cut)
    with BuildSketch(Plane(origin=(0, 53, 0), x_dir=(1, 0, 0), z_dir=(0, 1, 0))):
        with Locations(Location((0, -36.25, 0), (0, 0, 270))):
            Circle(SKETCH_27_R)
    extrude(amount=-CUT_EXTRUDE_13_DEPTH, mode=Mode.SUBTRACT)


solid = part.part
